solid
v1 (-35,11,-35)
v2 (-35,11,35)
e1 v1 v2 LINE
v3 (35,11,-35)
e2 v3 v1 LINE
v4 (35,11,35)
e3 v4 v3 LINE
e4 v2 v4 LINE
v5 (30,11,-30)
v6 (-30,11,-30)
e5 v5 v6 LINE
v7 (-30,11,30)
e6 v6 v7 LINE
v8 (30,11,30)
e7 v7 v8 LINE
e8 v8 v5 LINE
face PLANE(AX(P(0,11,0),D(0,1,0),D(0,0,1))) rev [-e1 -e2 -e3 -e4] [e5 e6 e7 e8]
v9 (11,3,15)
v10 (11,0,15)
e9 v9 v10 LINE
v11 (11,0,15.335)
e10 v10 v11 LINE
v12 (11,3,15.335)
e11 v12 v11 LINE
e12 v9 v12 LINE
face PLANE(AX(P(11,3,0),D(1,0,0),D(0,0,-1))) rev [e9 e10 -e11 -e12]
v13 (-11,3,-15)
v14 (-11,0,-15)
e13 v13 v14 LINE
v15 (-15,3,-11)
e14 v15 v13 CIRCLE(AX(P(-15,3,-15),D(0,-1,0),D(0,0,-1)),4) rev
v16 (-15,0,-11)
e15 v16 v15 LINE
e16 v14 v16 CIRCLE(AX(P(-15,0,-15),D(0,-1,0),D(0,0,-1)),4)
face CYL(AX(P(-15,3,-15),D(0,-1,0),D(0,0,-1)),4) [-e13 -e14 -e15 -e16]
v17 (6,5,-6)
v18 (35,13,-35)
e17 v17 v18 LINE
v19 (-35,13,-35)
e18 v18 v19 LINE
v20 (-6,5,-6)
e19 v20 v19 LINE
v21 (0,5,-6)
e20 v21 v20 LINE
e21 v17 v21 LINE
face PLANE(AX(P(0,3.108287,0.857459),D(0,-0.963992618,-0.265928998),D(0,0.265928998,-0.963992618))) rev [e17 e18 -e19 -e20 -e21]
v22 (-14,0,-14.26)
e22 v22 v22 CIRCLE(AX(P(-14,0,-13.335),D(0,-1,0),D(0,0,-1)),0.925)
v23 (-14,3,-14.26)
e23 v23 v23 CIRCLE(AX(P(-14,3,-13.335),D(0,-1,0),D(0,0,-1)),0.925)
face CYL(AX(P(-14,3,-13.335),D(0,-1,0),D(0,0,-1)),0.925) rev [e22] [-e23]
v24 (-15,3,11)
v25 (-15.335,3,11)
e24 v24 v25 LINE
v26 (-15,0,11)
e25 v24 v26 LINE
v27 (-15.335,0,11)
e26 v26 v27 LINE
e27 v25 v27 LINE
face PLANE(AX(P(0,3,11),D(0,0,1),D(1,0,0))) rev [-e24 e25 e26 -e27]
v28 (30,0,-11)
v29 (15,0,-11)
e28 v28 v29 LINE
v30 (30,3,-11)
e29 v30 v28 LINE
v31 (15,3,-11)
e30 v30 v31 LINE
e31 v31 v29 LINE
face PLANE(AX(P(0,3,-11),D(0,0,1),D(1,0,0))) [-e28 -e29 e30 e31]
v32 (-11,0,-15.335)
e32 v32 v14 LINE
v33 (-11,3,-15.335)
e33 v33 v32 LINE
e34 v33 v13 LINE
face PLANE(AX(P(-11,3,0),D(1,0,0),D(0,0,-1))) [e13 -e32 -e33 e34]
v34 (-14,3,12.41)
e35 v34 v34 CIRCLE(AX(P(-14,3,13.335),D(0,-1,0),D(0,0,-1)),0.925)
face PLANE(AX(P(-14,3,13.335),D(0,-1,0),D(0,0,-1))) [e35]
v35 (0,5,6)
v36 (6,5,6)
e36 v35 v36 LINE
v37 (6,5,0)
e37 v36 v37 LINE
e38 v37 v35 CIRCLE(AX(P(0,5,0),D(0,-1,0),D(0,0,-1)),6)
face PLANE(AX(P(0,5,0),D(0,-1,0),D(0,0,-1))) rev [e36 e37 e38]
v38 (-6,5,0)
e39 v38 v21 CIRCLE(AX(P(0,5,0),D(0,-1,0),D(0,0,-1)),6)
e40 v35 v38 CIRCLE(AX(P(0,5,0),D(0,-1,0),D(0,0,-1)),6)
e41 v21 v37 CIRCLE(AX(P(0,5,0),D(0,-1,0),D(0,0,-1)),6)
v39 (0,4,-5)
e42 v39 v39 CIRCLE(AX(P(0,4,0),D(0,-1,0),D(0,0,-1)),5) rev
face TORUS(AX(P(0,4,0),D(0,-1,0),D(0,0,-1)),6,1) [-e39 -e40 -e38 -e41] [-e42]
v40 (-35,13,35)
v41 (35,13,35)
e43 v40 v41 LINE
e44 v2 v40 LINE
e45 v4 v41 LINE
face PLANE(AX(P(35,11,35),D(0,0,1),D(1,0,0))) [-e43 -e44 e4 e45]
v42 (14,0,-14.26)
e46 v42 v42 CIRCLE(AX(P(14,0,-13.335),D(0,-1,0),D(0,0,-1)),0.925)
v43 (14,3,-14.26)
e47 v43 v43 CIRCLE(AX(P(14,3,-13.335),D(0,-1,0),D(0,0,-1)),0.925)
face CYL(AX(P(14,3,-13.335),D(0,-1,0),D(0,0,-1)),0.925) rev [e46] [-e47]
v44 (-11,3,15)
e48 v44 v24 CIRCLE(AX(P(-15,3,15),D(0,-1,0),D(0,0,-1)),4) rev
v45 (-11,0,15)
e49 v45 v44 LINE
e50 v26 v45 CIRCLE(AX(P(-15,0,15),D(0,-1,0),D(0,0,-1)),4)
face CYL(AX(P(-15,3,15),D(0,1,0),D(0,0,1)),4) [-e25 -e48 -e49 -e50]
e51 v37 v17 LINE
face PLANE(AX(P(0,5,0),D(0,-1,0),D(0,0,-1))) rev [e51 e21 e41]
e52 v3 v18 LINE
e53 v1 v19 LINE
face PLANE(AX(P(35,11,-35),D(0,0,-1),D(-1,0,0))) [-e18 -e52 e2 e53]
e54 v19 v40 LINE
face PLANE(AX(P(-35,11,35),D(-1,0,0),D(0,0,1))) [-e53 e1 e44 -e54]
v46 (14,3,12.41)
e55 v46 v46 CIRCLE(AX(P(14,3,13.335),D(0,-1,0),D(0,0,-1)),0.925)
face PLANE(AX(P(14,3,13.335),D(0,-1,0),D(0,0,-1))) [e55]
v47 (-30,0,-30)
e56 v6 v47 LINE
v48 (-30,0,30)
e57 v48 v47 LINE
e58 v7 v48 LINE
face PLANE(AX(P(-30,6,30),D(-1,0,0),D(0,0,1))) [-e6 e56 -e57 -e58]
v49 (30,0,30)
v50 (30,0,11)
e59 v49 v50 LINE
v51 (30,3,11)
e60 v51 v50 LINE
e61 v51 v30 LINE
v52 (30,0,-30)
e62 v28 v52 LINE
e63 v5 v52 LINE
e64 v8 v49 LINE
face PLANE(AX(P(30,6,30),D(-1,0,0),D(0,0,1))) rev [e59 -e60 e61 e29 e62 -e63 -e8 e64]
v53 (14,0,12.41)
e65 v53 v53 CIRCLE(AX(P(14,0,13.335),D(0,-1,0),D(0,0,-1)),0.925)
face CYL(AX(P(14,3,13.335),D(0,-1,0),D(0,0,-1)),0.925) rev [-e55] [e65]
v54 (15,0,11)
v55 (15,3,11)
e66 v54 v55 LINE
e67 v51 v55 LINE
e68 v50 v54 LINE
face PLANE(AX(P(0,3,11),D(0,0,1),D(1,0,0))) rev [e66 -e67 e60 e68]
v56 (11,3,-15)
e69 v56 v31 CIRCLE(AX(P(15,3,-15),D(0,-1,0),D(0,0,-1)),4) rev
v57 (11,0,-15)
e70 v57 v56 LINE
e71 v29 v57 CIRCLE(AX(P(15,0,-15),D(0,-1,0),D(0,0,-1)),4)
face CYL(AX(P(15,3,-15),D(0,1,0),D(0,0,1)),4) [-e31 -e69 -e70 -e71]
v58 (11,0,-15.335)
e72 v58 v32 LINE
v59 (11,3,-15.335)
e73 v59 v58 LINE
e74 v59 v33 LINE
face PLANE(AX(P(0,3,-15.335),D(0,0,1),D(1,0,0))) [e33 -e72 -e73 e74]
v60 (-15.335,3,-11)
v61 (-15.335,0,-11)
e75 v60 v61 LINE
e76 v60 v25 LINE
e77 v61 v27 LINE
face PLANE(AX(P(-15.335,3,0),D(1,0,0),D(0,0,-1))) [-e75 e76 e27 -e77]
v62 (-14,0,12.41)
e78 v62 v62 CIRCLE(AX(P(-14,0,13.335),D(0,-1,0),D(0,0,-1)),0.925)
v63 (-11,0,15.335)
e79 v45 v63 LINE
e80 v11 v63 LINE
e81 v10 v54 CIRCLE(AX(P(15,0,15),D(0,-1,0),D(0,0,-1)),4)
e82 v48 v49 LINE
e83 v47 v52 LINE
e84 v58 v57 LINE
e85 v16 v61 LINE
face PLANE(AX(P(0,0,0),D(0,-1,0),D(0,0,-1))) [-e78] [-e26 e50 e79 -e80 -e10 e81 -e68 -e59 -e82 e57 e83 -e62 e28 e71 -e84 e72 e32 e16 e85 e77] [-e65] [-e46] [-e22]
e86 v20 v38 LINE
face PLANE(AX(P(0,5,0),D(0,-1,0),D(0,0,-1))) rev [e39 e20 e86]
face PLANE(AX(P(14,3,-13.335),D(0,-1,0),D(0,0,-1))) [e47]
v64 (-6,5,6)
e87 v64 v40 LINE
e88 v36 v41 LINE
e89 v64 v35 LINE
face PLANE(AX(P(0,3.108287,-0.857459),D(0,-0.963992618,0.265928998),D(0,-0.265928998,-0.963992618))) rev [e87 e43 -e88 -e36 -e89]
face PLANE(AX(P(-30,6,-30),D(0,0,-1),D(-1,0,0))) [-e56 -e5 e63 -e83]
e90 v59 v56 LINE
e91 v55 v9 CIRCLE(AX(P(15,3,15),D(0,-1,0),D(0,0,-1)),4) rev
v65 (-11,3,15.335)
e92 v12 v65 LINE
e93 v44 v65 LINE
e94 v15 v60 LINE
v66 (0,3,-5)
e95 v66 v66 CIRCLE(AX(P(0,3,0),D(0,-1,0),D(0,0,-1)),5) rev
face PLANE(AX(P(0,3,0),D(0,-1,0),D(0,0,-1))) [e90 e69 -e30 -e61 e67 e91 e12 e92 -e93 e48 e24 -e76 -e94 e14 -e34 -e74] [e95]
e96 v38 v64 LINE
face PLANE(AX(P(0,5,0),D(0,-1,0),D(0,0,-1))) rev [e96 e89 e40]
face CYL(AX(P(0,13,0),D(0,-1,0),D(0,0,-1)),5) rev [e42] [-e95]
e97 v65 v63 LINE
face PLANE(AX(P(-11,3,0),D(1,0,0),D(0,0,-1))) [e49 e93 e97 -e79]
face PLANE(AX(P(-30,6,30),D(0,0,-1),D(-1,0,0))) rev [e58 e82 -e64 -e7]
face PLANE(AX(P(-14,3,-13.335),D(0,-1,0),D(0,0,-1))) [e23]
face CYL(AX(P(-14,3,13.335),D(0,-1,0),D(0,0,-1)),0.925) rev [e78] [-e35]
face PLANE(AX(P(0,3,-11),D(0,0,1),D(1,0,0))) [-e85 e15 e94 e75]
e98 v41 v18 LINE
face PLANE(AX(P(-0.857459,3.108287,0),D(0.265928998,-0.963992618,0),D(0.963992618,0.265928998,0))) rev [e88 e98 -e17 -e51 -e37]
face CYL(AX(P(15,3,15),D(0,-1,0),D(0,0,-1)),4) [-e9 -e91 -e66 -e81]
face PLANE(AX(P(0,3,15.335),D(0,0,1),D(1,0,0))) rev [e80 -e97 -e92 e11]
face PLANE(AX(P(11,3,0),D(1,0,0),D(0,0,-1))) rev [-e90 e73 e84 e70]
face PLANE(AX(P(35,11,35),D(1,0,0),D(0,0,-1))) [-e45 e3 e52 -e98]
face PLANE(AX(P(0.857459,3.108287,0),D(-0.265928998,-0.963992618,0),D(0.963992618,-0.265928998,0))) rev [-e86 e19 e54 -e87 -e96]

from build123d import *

# Parameters (mm, degrees)
SKETCH1_W            = 60
SKETCH1_H            = 60
BOSS_EXTRUDE1_DEPTH  = 6
SKETCH7_W            = 60
SKETCH7_H            = 60
SKETCH7_W_2          = 56
SKETCH7_H_2          = 56
BOSS_EXTRUDE4_DEPTH  = 7
SKETCH8_W            = 70
SKETCH8_H            = 70
SKETCH8_W_2          = 60
SKETCH8_H_2          = 60
BOSS_EXTRUDE5_DEPTH  = 2
SKETCH12_W           = 56
SKETCH12_H           = 56
BOSS_EXTRUDE10_DEPTH = 7
SKETCH13_W           = 12
SKETCH13_H           = 12
CUT_EXTRUDE3_DEPTH   = 8
SKETCH3_R            = 5
CUT_EXTRUDE4_DEPTH   = 52.17616649
SKETCH2_R            = 0.925
CUT_EXTRUDE5_DEPTH   = 3
SKETCH15_W           = 22
SKETCH15_H           = 4.335
SKETCH15_H_2         = 22
SKETCH15_R           = 5
SKETCH15_W_2         = 4.335
CUT_EXTRUDE6_DEPTH   = 3
SKETCH16_W           = 14.665
SKETCH16_H           = 22
CUT_EXTRUDE7_DEPTH   = 3
FILLET1_R            = 4
FILLET2_R            = 1


with BuildPart() as part:
    # Sketch1 → Boss-Extrude1 (new body)
    with BuildSketch(Plane(origin=(0, 0, 0), x_dir=(1, 0, 0), z_dir=(0, 1, 0))):
        Rectangle(SKETCH1_W, SKETCH1_H)
    extrude(amount=BOSS_EXTRUDE1_DEPTH)

    # Sketch7 → Boss-Extrude4 (add)
    with BuildSketch(Plane(origin=(0, 6, 0), x_dir=(1, 0, 0), z_dir=(0, 1, 0))):
        Rectangle(SKETCH7_W, SKETCH7_H)
        Rectangle(SKETCH7_W_2, SKETCH7_H_2, mode=Mode.SUBTRACT)
    extrude(amount=BOSS_EXTRUDE4_DEPTH)

    # Sketch8 → Boss-Extrude5 (add)
    with BuildSketch(Plane(origin=(0, 13, 0), x_dir=(1, 0, 0), z_dir=(0, 1, 0))):
        Rectangle(SKETCH8_W, SKETCH8_H)
        Rectangle(SKETCH8_W_2, SKETCH8_H_2, mode=Mode.SUBTRACT)
    extrude(amount=-BOSS_EXTRUDE5_DEPTH)

    # Sketch12 → Boss-Extrude10 (add)
    with BuildSketch(Plane(origin=(0, 6, 0), x_dir=(1, 0, 0), z_dir=(0, 1, 0))):
        Rectangle(SKETCH12_W, SKETCH12_H)
    extrude(amount=BOSS_EXTRUDE10_DEPTH)

    # Sketch13 → Cut-Extrude3 (cut)
    with BuildSketch(Plane(origin=(0, 13, 0), x_dir=(1, 0, 0), z_dir=(0, 1, 0))):
        Rectangle(SKETCH13_W, SKETCH13_H)
    extrude(amount=-CUT_EXTRUDE3_DEPTH, mode=Mode.SUBTRACT)

    # Sketch14 → section 1 of cut_loft1
    with BuildSketch(Plane(origin=(0, 13, 0), x_dir=(1, 0, 0), z_dir=(0, 1, 0)), mode=Mode.PRIVATE) as cut_loft1_s1:
        with BuildLine():
            Line((-35, 35), (-35, -35))
            Line((-35, -35), (35, -35))
            Line((35, -35), (35, 35))
            Line((35, 35), (-35, 35))
        make_face()
    # loft from a face of the part (cut_loft1)
    loft([part.faces().sort_by_distance((0, 5, 0))[0], cut_loft1_s1.sketch], mode=Mode.SUBTRACT)

    # Sketch3 → Cut-Extrude4 (cut, through all)
    with BuildSketch(Plane.XZ):
        with Locations(Location((0, 0, 0), (0, 0, 270))):
            Circle(SKETCH3_R)
    extrude(amount=-CUT_EXTRUDE4_DEPTH, mode=Mode.SUBTRACT)

    # Sketch2 → Cut-Extrude5 (cut)
    with BuildSketch(Plane.XZ):
        with Locations(Location((-14, -13.335, 0), (0, 0, 270))):
            Circle(SKETCH2_R)
        with Locations(Location((14, -13.335, 0), (0, 0, 270))):
            Circle(SKETCH2_R)
        with Locations(Location((14, 13.335, 0), (0, 0, 270))):
            Circle(SKETCH2_R)
        with Locations(Location((-14, 13.335, 0), (0, 0, 270))):
            Circle(SKETCH2_R)
    extrude(amount=-CUT_EXTRUDE5_DEPTH, mode=Mode.SUBTRACT)

    # Sketch15 → Cut-Extrude6 (cut)
    # profile 1 of 5: a face of its own
    with BuildSketch(Plane.XZ):
        with Locations((0, -13.1675)):
            Rectangle(SKETCH15_W, SKETCH15_H)
    # profile 2 of 5: a face of its own
    with BuildSketch(Plane.XZ):
        Rectangle(SKETCH15_W, SKETCH15_H_2)
        with Locations(Location((0, 0, 0), (0, 0, 270))):
            Circle(SKETCH15_R, mode=Mode.SUBTRACT)
    # profile 3 of 5: a face of its own
    with BuildSketch(Plane.XZ):
        with Locations((-13.1675, 0)):
            Rectangle(SKETCH15_W_2, SKETCH15_H_2)
    # profile 4 of 5: a face of its own
    with BuildSketch(Plane.XZ):
        with Locations((0, 13.1675)):
            Rectangle(SKETCH15_W, SKETCH15_H)
    # profile 5 of 5: a face of its own
    with BuildSketch(Plane.XZ):
        with Locations((13.1675, 0)):
            Rectangle(SKETCH15_W_2, SKETCH15_H_2)
    extrude(amount=-CUT_EXTRUDE6_DEPTH, mode=Mode.SUBTRACT)

    # Sketch16 → Cut-Extrude7 (cut)
    with BuildSketch(Plane.XZ):
        with Locations((22.6675, 0)):
            Rectangle(SKETCH16_W, SKETCH16_H)
    extrude(amount=-CUT_EXTRUDE7_DEPTH, mode=Mode.SUBTRACT)

    # Fillet1
    fillet1_edges = [part.edges().sort_by_distance(p)[0] for p in [
        (11, 1.5, -11),
        (-11, 1.5, -11),
        (-11, 1.5, 11),
        (11, 1.5, 11),
    ]]
    fillet(fillet1_edges, radius=FILLET1_R)

    # Fillet2
    fillet2_edges = [part.edges().sort_by_distance(p)[0] for p in [
        (0, 5, 5),
    ]]
    fillet(fillet2_edges, radius=FILLET2_R - 0.0001)  # a hair under: the kernel refuses the full size


solid = part.part
